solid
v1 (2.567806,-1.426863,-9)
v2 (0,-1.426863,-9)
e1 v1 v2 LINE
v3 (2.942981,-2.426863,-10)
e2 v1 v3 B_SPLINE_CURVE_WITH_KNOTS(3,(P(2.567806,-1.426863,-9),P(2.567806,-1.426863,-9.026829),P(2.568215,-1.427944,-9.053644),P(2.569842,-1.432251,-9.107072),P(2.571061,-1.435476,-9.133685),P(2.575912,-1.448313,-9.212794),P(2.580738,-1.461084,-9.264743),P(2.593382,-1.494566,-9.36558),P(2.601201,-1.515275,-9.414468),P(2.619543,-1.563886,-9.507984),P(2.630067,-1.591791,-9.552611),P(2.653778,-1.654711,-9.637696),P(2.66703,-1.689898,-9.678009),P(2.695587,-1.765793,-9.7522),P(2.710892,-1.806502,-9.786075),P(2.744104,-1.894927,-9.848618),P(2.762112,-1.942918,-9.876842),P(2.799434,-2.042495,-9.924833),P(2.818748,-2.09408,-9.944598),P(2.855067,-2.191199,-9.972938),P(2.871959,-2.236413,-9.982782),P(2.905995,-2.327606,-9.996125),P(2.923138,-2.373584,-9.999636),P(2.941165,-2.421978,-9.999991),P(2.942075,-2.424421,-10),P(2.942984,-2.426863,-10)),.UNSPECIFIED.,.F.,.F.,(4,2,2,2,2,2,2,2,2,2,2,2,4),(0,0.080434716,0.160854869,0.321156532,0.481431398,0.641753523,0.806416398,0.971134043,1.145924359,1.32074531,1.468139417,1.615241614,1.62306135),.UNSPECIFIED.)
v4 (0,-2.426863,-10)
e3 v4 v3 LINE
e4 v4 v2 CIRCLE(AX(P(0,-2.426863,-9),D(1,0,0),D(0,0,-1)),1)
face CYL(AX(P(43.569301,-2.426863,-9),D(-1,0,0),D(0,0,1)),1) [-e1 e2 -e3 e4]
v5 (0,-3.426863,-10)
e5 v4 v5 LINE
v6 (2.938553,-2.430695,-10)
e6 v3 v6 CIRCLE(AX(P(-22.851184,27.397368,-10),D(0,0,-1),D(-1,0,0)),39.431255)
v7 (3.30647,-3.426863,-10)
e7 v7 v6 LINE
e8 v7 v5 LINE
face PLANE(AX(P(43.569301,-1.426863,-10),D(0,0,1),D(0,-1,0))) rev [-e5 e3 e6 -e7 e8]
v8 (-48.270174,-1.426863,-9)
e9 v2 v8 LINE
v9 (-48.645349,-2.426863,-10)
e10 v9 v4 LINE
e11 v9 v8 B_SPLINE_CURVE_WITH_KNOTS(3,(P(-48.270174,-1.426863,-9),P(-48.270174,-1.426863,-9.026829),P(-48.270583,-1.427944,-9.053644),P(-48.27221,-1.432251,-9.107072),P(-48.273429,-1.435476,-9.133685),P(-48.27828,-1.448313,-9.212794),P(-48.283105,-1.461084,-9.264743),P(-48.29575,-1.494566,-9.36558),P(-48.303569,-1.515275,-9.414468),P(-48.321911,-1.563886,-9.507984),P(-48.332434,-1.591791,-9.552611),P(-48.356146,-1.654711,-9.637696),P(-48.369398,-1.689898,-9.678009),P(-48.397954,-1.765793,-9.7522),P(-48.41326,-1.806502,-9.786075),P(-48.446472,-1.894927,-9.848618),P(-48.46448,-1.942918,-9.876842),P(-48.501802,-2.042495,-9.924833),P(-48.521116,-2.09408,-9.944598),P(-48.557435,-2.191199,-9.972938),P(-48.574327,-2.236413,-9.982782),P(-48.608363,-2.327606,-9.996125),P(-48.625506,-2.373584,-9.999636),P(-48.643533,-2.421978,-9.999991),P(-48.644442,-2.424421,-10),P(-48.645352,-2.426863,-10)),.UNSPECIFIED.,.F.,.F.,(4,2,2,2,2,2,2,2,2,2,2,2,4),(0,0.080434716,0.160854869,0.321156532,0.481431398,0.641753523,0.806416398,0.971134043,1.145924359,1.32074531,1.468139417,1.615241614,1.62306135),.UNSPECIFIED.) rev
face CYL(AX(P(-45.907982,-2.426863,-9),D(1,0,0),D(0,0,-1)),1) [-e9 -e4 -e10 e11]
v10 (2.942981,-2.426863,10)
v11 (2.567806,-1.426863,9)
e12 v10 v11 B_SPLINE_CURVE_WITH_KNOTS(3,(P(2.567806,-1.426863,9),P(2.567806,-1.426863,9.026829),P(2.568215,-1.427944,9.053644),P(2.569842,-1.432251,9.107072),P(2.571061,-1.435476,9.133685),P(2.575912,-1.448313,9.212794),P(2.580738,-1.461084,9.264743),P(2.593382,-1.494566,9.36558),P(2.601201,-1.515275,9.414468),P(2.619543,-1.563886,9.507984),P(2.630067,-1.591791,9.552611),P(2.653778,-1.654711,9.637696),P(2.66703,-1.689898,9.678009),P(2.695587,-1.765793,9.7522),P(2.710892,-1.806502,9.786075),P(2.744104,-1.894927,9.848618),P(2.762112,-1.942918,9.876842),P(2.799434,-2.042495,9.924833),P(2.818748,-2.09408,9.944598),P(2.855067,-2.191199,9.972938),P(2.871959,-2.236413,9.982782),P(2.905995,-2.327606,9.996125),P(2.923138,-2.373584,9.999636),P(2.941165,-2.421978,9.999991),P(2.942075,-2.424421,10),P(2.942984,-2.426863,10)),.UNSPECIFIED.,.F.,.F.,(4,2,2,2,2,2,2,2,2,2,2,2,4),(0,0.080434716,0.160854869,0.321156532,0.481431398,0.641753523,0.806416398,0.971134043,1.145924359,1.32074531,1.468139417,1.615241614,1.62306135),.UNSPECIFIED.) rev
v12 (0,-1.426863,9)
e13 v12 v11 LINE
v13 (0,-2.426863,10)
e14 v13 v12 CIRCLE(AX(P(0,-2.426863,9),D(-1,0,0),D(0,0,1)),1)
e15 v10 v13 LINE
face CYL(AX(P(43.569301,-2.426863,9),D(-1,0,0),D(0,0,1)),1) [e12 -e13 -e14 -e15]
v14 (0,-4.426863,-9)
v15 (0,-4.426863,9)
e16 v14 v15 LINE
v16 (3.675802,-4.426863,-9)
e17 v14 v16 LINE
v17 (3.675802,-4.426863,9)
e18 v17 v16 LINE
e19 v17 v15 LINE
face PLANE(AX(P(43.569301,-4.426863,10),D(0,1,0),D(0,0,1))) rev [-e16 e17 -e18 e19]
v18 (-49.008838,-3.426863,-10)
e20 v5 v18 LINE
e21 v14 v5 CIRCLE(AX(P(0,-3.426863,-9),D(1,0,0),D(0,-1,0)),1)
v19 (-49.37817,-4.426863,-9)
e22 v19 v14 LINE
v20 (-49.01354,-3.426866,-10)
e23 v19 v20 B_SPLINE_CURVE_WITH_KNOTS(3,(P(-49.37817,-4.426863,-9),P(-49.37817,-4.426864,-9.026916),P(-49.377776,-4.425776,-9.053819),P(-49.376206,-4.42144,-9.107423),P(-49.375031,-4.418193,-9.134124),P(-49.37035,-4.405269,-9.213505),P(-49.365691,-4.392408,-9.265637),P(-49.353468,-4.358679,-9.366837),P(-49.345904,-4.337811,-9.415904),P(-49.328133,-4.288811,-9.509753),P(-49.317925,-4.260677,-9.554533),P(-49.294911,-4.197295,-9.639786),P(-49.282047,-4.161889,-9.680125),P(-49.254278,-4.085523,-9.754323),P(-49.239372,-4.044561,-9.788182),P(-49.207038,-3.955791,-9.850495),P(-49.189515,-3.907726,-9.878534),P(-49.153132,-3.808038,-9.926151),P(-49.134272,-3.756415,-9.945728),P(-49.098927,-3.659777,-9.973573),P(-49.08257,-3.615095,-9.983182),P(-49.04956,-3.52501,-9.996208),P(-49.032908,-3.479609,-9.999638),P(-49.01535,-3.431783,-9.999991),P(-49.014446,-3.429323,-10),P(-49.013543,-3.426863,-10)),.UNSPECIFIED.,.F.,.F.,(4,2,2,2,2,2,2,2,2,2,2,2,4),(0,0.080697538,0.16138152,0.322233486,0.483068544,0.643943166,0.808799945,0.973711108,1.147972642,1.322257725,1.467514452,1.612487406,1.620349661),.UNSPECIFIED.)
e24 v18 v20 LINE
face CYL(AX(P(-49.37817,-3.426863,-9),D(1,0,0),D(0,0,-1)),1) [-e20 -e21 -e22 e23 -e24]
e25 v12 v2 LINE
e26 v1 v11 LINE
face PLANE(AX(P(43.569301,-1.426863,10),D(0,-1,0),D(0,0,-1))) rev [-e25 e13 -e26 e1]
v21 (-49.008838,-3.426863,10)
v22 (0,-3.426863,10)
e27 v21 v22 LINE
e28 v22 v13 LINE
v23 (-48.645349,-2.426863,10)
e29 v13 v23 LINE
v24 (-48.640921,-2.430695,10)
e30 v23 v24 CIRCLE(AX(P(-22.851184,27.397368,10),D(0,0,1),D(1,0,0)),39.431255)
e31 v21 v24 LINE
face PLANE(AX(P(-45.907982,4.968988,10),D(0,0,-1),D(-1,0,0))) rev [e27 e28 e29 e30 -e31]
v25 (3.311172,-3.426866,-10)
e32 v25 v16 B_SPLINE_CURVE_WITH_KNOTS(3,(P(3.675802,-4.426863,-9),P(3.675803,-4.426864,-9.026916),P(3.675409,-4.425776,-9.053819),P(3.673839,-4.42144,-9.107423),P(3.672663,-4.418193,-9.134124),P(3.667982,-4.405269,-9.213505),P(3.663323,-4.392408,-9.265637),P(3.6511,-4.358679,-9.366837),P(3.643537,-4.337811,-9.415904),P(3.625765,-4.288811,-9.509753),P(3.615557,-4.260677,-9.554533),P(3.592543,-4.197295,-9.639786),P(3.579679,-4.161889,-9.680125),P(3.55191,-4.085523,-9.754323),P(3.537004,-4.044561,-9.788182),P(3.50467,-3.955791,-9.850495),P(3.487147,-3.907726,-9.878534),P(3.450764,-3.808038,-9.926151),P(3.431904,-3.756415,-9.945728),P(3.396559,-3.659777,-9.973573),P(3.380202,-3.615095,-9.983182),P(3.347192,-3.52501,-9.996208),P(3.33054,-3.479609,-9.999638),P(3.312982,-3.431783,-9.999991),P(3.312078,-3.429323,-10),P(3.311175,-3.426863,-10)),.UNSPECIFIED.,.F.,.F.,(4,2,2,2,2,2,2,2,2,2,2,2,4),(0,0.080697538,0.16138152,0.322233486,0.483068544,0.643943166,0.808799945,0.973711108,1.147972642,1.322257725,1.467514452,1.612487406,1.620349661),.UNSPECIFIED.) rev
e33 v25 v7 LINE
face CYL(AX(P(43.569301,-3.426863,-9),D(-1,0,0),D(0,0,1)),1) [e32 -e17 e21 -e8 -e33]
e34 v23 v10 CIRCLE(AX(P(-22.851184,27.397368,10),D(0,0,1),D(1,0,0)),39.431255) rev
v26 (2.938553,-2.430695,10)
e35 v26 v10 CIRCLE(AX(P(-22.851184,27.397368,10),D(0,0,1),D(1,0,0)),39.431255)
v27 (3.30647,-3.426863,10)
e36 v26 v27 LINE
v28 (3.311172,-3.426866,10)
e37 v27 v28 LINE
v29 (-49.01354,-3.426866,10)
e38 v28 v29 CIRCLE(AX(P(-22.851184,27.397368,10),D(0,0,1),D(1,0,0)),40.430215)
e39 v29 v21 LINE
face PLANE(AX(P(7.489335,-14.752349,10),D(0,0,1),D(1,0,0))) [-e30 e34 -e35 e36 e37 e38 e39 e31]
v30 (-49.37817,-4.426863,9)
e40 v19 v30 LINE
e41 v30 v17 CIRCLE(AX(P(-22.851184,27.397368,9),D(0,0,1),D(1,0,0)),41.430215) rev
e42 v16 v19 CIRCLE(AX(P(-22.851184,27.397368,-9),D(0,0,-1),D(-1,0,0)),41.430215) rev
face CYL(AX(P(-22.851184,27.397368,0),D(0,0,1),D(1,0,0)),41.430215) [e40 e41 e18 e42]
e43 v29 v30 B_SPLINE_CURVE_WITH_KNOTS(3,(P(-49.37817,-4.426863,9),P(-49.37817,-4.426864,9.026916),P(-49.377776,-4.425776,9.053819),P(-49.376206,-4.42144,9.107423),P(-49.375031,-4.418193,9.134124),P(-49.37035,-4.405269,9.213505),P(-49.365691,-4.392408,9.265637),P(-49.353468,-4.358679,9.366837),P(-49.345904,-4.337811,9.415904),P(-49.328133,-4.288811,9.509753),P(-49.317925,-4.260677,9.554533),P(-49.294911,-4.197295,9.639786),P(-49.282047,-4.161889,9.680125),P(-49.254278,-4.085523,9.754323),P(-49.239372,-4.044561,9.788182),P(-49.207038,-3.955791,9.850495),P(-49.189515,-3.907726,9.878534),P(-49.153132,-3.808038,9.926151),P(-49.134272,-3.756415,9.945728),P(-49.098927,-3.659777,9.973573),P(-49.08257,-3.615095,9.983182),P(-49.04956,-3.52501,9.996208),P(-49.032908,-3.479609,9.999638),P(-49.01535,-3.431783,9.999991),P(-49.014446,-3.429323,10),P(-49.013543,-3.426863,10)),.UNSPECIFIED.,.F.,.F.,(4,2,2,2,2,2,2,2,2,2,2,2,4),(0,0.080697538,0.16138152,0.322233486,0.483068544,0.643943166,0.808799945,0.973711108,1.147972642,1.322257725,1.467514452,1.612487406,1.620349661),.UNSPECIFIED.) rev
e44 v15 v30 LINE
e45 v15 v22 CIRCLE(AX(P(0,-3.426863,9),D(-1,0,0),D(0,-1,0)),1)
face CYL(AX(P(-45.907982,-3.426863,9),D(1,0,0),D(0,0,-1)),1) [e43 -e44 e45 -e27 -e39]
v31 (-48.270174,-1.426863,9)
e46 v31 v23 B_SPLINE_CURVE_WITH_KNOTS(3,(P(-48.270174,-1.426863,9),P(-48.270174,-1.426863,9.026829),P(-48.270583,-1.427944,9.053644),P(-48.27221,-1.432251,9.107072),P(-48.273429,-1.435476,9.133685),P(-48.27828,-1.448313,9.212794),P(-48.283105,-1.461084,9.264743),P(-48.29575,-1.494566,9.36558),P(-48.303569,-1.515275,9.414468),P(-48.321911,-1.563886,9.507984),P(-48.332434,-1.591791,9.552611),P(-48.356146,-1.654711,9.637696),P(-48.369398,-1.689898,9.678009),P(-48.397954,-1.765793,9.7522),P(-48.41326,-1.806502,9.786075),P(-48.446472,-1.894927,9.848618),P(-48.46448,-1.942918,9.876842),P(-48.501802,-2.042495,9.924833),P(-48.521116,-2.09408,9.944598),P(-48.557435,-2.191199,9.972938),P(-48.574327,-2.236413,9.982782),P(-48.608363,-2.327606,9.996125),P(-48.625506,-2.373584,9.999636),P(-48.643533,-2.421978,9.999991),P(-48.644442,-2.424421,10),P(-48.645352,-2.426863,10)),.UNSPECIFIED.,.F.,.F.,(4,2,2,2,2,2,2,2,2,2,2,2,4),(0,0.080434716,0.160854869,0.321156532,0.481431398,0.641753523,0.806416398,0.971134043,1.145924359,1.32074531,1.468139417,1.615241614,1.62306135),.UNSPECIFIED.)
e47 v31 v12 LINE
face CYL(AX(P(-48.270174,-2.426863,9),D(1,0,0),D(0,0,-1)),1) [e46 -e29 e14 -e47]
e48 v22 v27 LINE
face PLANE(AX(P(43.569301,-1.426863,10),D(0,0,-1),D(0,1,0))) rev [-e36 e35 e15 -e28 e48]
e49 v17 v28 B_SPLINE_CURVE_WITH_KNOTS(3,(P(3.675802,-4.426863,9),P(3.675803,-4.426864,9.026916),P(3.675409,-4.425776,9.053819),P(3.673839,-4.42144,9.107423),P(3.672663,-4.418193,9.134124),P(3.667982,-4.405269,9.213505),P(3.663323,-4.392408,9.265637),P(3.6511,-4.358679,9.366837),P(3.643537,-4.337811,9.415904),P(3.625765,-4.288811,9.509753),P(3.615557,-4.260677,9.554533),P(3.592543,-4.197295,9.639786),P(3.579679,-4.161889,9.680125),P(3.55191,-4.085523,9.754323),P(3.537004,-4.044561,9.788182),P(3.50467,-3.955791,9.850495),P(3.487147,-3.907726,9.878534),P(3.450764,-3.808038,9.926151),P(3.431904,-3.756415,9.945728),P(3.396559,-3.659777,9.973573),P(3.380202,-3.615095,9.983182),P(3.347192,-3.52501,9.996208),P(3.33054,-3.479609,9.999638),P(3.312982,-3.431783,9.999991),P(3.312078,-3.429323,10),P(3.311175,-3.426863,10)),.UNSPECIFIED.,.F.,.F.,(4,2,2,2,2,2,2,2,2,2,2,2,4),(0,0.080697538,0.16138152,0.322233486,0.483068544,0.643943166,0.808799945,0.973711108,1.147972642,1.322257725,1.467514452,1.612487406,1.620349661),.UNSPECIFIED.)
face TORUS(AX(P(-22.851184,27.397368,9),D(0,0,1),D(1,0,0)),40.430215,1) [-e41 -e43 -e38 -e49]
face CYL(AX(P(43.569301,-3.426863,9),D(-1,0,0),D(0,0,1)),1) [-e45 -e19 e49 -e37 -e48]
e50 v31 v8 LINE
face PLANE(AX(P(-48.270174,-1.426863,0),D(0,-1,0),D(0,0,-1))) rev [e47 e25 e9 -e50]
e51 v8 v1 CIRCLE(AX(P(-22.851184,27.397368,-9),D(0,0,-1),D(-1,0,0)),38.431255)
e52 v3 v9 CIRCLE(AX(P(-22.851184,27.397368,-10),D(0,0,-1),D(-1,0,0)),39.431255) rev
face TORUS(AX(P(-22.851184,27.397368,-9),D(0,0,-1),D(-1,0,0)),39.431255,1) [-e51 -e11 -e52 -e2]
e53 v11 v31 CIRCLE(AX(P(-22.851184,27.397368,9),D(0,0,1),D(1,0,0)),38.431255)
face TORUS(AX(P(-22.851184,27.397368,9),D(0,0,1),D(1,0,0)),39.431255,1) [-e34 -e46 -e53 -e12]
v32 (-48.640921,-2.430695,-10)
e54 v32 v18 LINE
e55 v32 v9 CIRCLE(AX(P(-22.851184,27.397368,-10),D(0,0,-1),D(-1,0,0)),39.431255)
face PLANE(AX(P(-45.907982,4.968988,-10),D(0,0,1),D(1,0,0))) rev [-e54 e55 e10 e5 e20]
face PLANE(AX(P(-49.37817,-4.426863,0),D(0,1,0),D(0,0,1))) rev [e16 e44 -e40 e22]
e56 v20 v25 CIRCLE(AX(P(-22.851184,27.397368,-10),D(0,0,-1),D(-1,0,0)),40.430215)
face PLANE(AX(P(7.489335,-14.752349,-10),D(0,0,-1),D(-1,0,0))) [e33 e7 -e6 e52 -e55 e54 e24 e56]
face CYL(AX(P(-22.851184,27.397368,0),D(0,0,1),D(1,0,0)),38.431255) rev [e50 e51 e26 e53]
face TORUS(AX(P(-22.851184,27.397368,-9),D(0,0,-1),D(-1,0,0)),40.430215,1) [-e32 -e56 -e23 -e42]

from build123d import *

# Parameters (mm, degrees)
WYCI_GNI_CIE_START            = -10
WYCI_GNI_CIE_PO_CIE_CE1_DEPTH = 20
ZAOKR_GLENIE3_R               = 1


# Read off the part's stored shape, not the designer's step: Wyciągnięcie po ścieżce1
with BuildPart() as part:
    # Wyciągnięcie po ścieżce1 outline → Wyciągnięcie po ścieżce1 (new body)
    with BuildSketch(Plane.XY.offset(WYCI_GNI_CIE_START)):
        with BuildLine():
            Line((-49.378170185, -4.426863255), (3.675802301, -4.426863255))
            ThreePointArc((3.675802301, -4.426863255), (-22.851183942, 68.827583292), (-49.378170185, -4.426863255))
        make_face()
        with BuildLine():
            Line((2.567806336, -1.426863255), (-48.270174221, -1.426863255))
            ThreePointArc((-48.270174221, -1.426863255), (-22.851183943, 65.828623711), (2.567806336, -1.426863255))
        make_face(mode=Mode.SUBTRACT)
    extrude(amount=WYCI_GNI_CIE_PO_CIE_CE1_DEPTH)

    # Zaokrąglenie3
    zaokr_glenie3_edges = [part.edges().sort_by_distance(p)[0] for p in [
        (-22.851183942, -1.426863255, 10),
        (-22.851183942, -4.426863255, 10),
        (-22.851183942, -4.426863255, 10),
        (-22.851183942, -1.426863255, 10),
        (-22.851183942, -1.426863255, -10),
        (-22.851183942, -4.426863255, -10),
        (-22.851183942, -4.426863255, -10),
        (-22.851183942, -1.426863255, -10),
        (-22.851183942, 65.828623711, -10),
        (-22.851183942, 68.827583292, -10),
        (-22.851183942, 68.827583292, 10),
        (-22.851183942, 65.828623711, 10),
    ]]
    fillet(zaokr_glenie3_edges, radius=ZAOKR_GLENIE3_R)


solid = part.part
